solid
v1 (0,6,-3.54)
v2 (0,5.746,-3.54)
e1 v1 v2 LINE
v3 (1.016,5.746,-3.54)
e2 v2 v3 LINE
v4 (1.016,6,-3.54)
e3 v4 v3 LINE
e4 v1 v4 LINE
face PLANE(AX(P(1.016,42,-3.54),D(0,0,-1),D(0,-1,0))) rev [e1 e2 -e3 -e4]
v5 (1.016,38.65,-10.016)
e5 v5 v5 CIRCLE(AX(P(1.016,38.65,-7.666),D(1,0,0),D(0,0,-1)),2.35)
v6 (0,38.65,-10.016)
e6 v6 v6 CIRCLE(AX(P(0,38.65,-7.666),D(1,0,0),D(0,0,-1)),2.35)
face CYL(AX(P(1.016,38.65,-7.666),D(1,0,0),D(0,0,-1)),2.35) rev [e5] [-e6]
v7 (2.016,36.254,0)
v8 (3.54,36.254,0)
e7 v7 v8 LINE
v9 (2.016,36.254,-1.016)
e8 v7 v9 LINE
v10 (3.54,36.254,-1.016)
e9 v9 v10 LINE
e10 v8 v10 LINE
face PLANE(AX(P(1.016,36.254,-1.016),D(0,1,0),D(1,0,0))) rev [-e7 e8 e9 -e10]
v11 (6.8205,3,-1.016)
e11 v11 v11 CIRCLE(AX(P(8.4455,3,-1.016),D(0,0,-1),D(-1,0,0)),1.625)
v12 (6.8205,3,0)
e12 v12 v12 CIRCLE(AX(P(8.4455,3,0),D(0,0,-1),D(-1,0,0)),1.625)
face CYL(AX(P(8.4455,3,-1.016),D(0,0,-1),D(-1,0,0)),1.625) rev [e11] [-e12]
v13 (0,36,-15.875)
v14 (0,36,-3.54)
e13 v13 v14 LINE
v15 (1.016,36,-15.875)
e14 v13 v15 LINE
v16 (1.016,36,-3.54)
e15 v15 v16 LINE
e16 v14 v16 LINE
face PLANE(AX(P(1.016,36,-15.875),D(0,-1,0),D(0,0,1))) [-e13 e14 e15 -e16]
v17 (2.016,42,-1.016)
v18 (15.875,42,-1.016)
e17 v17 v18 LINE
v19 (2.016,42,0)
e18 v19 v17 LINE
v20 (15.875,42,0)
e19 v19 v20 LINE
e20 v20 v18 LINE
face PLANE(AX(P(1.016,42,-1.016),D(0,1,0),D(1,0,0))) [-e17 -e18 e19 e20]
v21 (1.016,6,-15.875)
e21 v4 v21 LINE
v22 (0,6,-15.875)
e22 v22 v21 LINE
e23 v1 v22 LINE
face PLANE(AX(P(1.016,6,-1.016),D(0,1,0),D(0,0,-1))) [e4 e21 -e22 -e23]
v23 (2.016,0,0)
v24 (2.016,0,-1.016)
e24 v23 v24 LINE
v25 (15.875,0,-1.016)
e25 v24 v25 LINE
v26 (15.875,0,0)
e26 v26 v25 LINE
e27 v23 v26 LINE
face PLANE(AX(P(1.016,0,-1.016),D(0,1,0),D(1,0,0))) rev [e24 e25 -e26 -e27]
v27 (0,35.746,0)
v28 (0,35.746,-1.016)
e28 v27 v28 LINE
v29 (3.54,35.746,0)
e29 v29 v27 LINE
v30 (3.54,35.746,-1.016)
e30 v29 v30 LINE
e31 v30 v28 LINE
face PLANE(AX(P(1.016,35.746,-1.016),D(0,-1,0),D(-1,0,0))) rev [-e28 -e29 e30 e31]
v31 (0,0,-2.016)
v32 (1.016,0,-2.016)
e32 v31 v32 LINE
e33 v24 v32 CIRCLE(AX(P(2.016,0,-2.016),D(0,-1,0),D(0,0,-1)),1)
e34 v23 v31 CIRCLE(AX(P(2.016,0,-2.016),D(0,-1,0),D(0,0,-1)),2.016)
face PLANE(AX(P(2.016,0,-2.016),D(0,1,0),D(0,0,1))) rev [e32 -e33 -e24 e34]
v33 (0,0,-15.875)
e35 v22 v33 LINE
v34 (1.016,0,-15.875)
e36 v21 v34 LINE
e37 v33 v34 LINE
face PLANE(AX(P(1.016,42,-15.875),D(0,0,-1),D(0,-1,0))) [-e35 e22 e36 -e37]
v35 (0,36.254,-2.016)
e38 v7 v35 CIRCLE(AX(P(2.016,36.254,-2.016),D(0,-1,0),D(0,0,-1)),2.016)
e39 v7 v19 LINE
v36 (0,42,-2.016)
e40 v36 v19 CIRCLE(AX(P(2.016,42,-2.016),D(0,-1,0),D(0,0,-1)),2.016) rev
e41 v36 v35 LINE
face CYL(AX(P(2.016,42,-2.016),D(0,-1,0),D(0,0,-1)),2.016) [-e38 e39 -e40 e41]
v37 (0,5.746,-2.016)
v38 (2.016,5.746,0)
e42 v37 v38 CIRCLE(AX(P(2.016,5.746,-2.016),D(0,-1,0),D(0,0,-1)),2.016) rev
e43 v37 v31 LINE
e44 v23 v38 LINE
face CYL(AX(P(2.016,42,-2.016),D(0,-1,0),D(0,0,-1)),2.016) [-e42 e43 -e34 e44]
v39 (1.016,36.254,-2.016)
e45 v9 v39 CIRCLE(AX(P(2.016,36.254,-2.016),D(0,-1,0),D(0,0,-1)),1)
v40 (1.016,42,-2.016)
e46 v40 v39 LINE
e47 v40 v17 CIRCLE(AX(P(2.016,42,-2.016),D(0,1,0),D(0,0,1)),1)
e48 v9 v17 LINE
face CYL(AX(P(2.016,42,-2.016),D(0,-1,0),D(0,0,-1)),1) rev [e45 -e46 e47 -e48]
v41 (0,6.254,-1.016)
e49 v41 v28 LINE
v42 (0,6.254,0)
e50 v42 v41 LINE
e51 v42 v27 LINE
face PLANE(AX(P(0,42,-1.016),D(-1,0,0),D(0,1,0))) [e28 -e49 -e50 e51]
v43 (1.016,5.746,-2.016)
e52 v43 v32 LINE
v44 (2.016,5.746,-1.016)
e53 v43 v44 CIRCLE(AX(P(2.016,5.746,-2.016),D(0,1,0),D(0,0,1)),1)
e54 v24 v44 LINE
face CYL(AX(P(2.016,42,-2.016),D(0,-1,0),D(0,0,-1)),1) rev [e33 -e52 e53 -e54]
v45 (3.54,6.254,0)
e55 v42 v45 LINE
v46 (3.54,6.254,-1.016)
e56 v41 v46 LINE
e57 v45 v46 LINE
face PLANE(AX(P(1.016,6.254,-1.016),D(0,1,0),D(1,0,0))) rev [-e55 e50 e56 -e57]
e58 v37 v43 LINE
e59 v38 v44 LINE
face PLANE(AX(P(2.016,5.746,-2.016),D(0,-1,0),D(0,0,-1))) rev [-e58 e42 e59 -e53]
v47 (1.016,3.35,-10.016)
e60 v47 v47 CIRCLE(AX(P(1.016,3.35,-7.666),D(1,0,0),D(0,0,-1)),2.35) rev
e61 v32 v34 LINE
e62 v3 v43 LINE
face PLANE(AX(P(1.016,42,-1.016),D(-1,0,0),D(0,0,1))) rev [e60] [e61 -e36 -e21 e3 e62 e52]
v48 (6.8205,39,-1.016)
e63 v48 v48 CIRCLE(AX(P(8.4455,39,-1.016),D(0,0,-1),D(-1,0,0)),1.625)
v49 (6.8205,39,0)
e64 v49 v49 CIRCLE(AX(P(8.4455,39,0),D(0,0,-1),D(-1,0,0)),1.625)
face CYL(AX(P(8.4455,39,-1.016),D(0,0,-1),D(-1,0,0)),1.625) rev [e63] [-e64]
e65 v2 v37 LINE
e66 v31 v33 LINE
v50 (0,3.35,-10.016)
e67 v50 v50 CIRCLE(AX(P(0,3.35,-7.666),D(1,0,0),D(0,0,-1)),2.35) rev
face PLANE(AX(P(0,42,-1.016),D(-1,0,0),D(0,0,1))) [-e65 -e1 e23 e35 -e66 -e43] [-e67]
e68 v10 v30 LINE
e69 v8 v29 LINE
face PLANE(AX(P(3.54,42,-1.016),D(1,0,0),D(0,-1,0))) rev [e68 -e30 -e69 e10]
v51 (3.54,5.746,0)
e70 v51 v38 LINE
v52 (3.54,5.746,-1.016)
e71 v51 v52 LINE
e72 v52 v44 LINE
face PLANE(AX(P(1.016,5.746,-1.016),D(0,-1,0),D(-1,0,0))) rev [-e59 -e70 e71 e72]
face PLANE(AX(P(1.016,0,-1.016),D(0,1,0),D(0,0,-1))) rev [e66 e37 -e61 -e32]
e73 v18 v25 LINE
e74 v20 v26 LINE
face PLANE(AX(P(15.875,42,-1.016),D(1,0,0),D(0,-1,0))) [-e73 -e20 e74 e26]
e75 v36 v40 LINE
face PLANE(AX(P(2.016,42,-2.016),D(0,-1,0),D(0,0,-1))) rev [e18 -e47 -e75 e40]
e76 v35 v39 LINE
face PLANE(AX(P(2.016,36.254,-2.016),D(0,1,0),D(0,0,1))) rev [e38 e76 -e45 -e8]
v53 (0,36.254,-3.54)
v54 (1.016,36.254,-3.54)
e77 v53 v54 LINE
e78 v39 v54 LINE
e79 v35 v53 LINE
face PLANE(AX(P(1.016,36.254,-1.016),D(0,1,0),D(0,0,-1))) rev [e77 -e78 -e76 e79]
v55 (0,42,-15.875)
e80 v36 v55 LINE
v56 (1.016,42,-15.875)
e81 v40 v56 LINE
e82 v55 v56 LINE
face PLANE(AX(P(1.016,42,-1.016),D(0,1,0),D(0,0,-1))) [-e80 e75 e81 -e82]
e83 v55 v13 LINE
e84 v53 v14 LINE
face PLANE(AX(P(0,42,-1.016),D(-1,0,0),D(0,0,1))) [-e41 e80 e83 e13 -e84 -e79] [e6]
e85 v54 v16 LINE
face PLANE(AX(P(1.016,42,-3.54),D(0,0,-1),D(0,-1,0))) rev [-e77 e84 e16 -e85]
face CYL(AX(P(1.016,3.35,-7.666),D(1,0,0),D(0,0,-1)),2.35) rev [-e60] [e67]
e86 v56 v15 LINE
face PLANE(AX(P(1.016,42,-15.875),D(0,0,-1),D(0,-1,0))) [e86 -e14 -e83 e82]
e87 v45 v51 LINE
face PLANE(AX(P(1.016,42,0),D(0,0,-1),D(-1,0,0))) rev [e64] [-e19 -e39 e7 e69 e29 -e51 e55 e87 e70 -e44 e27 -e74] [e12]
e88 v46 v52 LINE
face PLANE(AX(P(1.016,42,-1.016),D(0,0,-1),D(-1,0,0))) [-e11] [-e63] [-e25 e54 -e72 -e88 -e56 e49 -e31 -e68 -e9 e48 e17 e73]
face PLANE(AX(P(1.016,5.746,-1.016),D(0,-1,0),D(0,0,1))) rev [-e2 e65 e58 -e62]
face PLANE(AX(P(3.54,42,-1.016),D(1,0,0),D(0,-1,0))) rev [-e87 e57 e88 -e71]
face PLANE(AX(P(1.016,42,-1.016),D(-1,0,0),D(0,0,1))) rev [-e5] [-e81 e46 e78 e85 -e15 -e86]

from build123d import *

# Parameters (mm, degrees)
BOSS_EXTRUDE1_DEPTH    = 42
SKETCH4_W              = 14.859
SKETCH4_H              = 30
CUT_EXTRUDE2_DEPTH     = 6.35
SKETCH6_R              = 2.35
CUT_EXTRUDE3_DEPTH     = 6.35
CUT_EXTRUDE4_REACH     = 49.295
SKETCH7_R              = 1.625
CONVERT_SOLID1_DEPTH   = 6.254
CONVERT_SOLID1_START   = 35.746
CONVERT_SOLID1_2_DEPTH = 6.254
CONVERT_SOLID1_START_2 = 5.746
CONVERT_SOLID1_3_DEPTH = 0.508
CONVERT_SOLID1_4_DEPTH = 0.508
CONVERT_SOLID1_5_DEPTH = 5.746
CONVERT_SOLID1_START_3 = 36.254
CONVERT_SOLID1_6_DEPTH = 5.746


# Read off the part's stored shape, not the designer's step: Convert-Solid1
with BuildPart() as part:
    # Sketch1 → Boss-Extrude1 (new body)
    with BuildSketch(Plane(origin=(0, 0, 0), x_dir=(1, 0, 0), z_dir=(0, 1, 0))):
        Polygon((0, 0), (15.875, 0), (15.875, 1.016), (1.016, 1.016), (1.016, 15.875), (0, 15.875), align=None)
    extrude(amount=BOSS_EXTRUDE1_DEPTH)

    # Sketch4 → Cut-Extrude2 (cut)
    with BuildSketch(Plane(origin=(1.016, 0, 0), x_dir=(0, 0, -1), z_dir=(1, 0, 0))):
        with Locations((8.4455, 21)):
            Rectangle(SKETCH4_W, SKETCH4_H)
    extrude(amount=-CUT_EXTRUDE2_DEPTH, mode=Mode.SUBTRACT)

    # Sketch6 → Cut-Extrude3 (cut)
    with BuildSketch(Plane(origin=(1.016, 0, 0), x_dir=(0, 0, -1), z_dir=(1, 0, 0))):
        with Locations((7.666, 3.35)):
            Circle(SKETCH6_R)
        with Locations((7.666, 38.65)):
            Circle(SKETCH6_R)
    extrude(amount=-CUT_EXTRUDE3_DEPTH, mode=Mode.SUBTRACT)

    # Sketch7 → Cut-Extrude4 (cut, up to next)
    with BuildSketch(Plane(origin=(0, 0, -1.016), x_dir=(-1, 0, 0), z_dir=(0, 0, -1)), mode=Mode.PRIVATE) as cut_extrude4_sk1:
        with Locations((-8.4455, 39)):
            Circle(SKETCH7_R)
    cut_extrude4_tool1 = extrude(cut_extrude4_sk1.sketch, amount=-CUT_EXTRUDE4_REACH, mode=Mode.PRIVATE) & part.part
    # Sketch7 → Cut-Extrude4 (cut, up to next)
    with BuildSketch(Plane(origin=(0, 0, -1.016), x_dir=(-1, 0, 0), z_dir=(0, 0, -1)), mode=Mode.PRIVATE) as cut_extrude4_sk2:
        with Locations((-8.4455, 3)):
            Circle(SKETCH7_R)
    cut_extrude4_tool2 = extrude(cut_extrude4_sk2.sketch, amount=-CUT_EXTRUDE4_REACH, mode=Mode.PRIVATE) & part.part
    add(cut_extrude4_tool1.solids().sort_by_distance((8.4455, 39, -1.016))[0], mode=Mode.SUBTRACT)
    add(cut_extrude4_tool2.solids().sort_by_distance((8.4455, 3, -1.016))[0], mode=Mode.SUBTRACT)

    # Convert-Solid1 outline → Convert-Solid1 (cut)
    with BuildSketch(Plane(origin=(0, 0, 0), x_dir=(1, 0, 0), z_dir=(0, 1, 0))):
        with BuildLine():
            Line((0, 0), (2.016, 0))
            ThreePointArc((2.016, 0), (0.590472729, 0.590472729), (0, 2.016))
            Line((0, 2.016), (0, 0))
        make_face()
    extrude(amount=CONVERT_SOLID1_DEPTH, mode=Mode.SUBTRACT)

    # Convert-Solid1 2 outline → Convert-Solid1 2 (cut)
    with BuildSketch(Plane(origin=(0, 0, 0), x_dir=(1, 0, 0), z_dir=(0, 1, 0)).offset(CONVERT_SOLID1_START)):
        with BuildLine():
            Line((0, 0), (2.016, 0))
            ThreePointArc((2.016, 0), (0.590472729, 0.590472729), (0, 2.016))
            Line((0, 2.016), (0, 0))
        make_face()
    extrude(amount=CONVERT_SOLID1_2_DEPTH, mode=Mode.SUBTRACT)

    # Convert-Solid1 3 outline → Convert-Solid1 3 (cut)
    with BuildSketch(Plane(origin=(0, 0, 0), x_dir=(1, 0, 0), z_dir=(0, 1, 0)).offset(CONVERT_SOLID1_START_2)):
        with BuildLine():
            Line((2.016, 0), (3.54, 0))
            Line((3.54, 0), (3.54, 1.016))
            Line((3.54, 1.016), (1.016, 1.016))
            Line((1.016, 1.016), (1.016, 3.54))
            Line((1.016, 3.54), (0, 3.54))
            Line((0, 3.54), (0, 2.016))
            ThreePointArc((0, 2.016), (0.590472729, 0.590472729), (2.016, 0))
        make_face()
    extrude(amount=CONVERT_SOLID1_3_DEPTH, mode=Mode.SUBTRACT)

    # Convert-Solid1 4 outline → Convert-Solid1 4 (cut)
    with BuildSketch(Plane(origin=(0, 0, 0), x_dir=(1, 0, 0), z_dir=(0, 1, 0)).offset(CONVERT_SOLID1_START)):
        with BuildLine():
            Line((2.016, 0), (3.54, 0))
            Line((3.54, 0), (3.54, 1.016))
            Line((3.54, 1.016), (1.016, 1.016))
            Line((1.016, 1.016), (1.016, 3.54))
            Line((1.016, 3.54), (0, 3.54))
            Line((0, 3.54), (0, 2.016))
            ThreePointArc((0, 2.016), (0.590472729, 0.590472729), (2.016, 0))
        make_face()
    extrude(amount=CONVERT_SOLID1_4_DEPTH, mode=Mode.SUBTRACT)

    # Convert-Solid1 5 outline → Convert-Solid1 5 (add)
    with BuildSketch(Plane(origin=(0, 0, 0), x_dir=(1, 0, 0), z_dir=(0, 1, 0))):
        with BuildLine():
            Line((1.016, 1.016), (2.016, 1.016))
            ThreePointArc((2.016, 1.016), (1.308893219, 1.308893219), (1.016, 2.016))
            Line((1.016, 2.016), (1.016, 1.016))
        make_face()
    extrude(amount=CONVERT_SOLID1_5_DEPTH)

    # Convert-Solid1 6 outline → Convert-Solid1 6 (add)
    with BuildSketch(Plane(origin=(0, 0, 0), x_dir=(1, 0, 0), z_dir=(0, 1, 0)).offset(CONVERT_SOLID1_START_3)):
        with BuildLine():
            Line((1.016, 1.016), (2.016, 1.016))
            ThreePointArc((2.016, 1.016), (1.308893219, 1.308893219), (1.016, 2.016))
            Line((1.016, 2.016), (1.016, 1.016))
        make_face()
    extrude(amount=CONVERT_SOLID1_6_DEPTH)


solid = part.part
